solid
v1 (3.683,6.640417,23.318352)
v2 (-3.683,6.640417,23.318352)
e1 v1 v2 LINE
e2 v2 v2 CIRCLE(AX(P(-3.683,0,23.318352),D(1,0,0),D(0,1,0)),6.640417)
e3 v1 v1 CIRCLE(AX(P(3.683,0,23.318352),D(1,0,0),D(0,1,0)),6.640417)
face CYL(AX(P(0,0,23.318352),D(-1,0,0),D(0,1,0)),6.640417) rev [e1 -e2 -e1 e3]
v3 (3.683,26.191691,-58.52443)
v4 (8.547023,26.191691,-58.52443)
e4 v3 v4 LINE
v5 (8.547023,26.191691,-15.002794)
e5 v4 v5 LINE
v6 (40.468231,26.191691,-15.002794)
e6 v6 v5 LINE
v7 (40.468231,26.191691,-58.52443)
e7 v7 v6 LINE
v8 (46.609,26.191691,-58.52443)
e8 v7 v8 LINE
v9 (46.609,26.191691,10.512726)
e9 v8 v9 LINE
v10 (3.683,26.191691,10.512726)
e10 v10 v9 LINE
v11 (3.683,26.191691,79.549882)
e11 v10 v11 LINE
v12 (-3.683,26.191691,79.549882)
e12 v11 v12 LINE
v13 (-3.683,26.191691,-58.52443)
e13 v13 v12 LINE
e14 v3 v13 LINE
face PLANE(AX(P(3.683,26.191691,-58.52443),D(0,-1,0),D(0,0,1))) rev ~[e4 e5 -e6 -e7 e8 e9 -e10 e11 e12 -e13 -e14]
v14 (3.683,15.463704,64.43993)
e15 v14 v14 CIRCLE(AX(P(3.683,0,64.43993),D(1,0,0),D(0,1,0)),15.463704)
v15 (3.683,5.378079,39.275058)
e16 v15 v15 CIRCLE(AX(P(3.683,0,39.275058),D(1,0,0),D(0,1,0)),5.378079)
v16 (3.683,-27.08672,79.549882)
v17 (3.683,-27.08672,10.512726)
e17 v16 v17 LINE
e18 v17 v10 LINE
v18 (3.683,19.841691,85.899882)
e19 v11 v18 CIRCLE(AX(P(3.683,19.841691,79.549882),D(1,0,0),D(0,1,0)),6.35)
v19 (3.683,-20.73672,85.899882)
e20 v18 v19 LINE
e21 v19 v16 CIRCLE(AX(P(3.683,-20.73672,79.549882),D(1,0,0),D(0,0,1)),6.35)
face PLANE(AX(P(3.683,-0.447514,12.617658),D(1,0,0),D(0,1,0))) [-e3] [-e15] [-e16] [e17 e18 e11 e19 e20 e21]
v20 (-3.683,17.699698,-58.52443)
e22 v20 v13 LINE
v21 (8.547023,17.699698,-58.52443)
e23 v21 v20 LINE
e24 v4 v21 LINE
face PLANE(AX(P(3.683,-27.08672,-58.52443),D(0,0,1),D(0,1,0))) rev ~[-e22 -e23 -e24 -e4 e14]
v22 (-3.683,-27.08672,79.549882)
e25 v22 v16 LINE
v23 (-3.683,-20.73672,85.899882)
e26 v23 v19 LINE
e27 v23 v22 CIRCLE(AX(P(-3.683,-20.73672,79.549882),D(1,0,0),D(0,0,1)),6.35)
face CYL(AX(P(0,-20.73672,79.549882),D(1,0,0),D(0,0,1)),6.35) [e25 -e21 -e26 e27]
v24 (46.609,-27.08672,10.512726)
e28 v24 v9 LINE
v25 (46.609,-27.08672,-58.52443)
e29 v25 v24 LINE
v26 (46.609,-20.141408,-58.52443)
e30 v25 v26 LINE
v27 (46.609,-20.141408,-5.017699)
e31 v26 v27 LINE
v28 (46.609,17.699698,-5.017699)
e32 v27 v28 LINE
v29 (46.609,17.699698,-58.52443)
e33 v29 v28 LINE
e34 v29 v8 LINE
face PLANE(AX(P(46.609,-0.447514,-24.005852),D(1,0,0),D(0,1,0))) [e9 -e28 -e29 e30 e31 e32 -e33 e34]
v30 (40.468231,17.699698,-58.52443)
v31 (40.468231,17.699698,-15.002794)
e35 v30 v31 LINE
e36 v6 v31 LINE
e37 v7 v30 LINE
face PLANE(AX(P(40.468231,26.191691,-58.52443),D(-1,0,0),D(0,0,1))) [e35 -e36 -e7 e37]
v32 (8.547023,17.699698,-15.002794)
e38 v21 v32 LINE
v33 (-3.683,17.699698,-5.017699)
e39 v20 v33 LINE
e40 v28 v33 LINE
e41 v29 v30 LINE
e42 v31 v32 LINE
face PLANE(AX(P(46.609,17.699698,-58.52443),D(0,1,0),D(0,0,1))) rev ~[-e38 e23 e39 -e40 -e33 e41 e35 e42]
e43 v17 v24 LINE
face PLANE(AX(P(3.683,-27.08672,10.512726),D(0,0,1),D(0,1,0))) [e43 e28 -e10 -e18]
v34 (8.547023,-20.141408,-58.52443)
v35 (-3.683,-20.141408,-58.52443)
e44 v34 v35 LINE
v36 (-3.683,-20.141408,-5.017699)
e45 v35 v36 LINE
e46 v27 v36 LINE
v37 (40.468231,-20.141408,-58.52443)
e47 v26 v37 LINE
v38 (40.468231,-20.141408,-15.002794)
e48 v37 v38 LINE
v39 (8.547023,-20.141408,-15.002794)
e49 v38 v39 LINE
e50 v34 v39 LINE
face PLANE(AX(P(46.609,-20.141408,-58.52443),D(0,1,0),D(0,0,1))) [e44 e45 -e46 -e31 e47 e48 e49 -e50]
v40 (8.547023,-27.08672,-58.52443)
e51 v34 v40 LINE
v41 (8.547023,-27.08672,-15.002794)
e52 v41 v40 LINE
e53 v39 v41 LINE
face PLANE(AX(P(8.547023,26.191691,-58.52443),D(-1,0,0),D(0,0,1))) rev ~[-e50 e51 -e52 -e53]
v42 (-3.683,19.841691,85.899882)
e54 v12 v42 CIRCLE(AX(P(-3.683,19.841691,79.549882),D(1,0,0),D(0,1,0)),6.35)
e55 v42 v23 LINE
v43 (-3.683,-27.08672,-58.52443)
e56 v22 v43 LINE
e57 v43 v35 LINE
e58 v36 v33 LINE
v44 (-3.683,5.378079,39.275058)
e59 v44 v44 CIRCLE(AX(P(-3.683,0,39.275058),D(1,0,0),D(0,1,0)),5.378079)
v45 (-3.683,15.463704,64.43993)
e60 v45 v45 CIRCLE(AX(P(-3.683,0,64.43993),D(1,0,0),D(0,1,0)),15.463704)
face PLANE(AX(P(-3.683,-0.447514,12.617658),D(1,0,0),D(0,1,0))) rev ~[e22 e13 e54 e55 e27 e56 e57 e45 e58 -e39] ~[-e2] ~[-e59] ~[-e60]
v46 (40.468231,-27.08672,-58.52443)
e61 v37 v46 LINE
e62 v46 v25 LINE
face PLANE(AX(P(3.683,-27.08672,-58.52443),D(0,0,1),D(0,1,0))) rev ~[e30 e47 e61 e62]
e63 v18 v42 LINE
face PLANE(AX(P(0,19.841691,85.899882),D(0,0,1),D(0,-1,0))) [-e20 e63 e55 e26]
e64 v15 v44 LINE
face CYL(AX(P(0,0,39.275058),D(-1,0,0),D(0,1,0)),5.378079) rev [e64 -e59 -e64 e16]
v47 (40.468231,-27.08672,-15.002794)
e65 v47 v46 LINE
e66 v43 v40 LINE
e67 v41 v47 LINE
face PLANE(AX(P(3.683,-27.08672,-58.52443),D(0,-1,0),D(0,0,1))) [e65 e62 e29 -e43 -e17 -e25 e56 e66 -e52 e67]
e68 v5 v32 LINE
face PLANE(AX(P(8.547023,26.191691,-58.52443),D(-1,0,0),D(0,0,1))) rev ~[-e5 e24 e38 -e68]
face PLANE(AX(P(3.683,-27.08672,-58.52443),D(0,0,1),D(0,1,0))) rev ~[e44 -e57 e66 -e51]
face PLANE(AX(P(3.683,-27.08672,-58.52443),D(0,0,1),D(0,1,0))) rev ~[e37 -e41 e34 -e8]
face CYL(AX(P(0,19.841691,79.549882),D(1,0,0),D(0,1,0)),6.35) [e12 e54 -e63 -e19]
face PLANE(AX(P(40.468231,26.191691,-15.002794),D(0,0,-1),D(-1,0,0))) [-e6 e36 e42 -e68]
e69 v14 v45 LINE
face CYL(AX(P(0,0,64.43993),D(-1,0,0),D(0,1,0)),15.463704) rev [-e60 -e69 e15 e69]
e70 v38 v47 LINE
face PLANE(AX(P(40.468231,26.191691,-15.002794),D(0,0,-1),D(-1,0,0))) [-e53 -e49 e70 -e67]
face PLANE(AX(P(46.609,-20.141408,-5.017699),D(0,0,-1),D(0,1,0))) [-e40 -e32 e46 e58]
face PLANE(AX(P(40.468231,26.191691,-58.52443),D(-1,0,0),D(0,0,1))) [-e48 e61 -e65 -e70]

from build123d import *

# Parameters (mm, degrees)
F0_R     = 6.6404165098
F0_R_2   = 5.3780790225
F0_R_3   = 15.463703615
F1_DEPTH = 3.683
F2_W     = 53.2784113497
F2_H     = 69.0371559083
F3_DEPTH = 42.926
F4_W     = 37.8411058336
F4_H     = 53.5067310557
F5_DEPTH = 50.293
F6_W     = 31.9212079048
F6_H     = 43.5216361657
F7_DEPTH = 53.2794113497


# Not quite as in the source:
# - a feature names something its author has since deleted; it is built from what else it names


with BuildPart() as f1:
    # F0 (on Right) → F1 (new body, symmetric)
    with BuildSketch(Plane.YZ):
        with BuildLine():
            Line((19.8416914791, 85.8998820186), (-20.7367198706, 85.8998820186))
            ThreePointArc((-20.7367198706, 85.8998820186), (-25.2268479311, 84.0400100791), (-27.0867198706, 79.5498820186))
            Line((-27.0867198706, 79.5498820186), (-27.0867198706, -58.5244297981))
            Line((-27.0867198706, -58.5244297981), (26.1916914791, -58.5244297981))
            Line((26.1916914791, -58.5244297981), (26.1916914791, 79.5498820186))
            ThreePointArc((26.1916914791, 79.5498820186), (24.3318195396, 84.0400100791), (19.8416914791, 85.8998820186))
        make_face()
        with Locations((0, 23.3183521777)):
            Circle(F0_R, mode=Mode.SUBTRACT)
        with Locations((0, 39.2750576138)):
            Circle(F0_R_2, mode=Mode.SUBTRACT)
        with Locations((0, 64.4399300218)):
            Circle(F0_R_3, mode=Mode.SUBTRACT)
    extrude(amount=F1_DEPTH, both=True)

    # F2 (on face) → F3 (join)
    with BuildSketch(Plane.YZ.offset(3.683)):
        with Locations((-0.4475141957, -24.005851844)):
            Rectangle(F2_W, F2_H)
    extrude(amount=F3_DEPTH)

    # F4 (on face) → F5 (cut, through all)
    with BuildSketch(Plane.YZ.offset(46.609)):
        with Locations((-1.2208549306, -31.7710642703)):
            Rectangle(F4_W, F4_H)
    extrude(amount=-F5_DEPTH, mode=Mode.SUBTRACT)

    # F6 (on face) → F7 (cut, through all)
    with BuildSketch(Plane(origin=(0, 26.1916914791, 0), x_dir=(-1, 0, 0), z_dir=(0, 1, 0))):
        with Locations((-24.5076268911, -36.7636117153)):
            Rectangle(F6_W, F6_H)
    extrude(amount=-F7_DEPTH, mode=Mode.SUBTRACT)


solid = f1.part
